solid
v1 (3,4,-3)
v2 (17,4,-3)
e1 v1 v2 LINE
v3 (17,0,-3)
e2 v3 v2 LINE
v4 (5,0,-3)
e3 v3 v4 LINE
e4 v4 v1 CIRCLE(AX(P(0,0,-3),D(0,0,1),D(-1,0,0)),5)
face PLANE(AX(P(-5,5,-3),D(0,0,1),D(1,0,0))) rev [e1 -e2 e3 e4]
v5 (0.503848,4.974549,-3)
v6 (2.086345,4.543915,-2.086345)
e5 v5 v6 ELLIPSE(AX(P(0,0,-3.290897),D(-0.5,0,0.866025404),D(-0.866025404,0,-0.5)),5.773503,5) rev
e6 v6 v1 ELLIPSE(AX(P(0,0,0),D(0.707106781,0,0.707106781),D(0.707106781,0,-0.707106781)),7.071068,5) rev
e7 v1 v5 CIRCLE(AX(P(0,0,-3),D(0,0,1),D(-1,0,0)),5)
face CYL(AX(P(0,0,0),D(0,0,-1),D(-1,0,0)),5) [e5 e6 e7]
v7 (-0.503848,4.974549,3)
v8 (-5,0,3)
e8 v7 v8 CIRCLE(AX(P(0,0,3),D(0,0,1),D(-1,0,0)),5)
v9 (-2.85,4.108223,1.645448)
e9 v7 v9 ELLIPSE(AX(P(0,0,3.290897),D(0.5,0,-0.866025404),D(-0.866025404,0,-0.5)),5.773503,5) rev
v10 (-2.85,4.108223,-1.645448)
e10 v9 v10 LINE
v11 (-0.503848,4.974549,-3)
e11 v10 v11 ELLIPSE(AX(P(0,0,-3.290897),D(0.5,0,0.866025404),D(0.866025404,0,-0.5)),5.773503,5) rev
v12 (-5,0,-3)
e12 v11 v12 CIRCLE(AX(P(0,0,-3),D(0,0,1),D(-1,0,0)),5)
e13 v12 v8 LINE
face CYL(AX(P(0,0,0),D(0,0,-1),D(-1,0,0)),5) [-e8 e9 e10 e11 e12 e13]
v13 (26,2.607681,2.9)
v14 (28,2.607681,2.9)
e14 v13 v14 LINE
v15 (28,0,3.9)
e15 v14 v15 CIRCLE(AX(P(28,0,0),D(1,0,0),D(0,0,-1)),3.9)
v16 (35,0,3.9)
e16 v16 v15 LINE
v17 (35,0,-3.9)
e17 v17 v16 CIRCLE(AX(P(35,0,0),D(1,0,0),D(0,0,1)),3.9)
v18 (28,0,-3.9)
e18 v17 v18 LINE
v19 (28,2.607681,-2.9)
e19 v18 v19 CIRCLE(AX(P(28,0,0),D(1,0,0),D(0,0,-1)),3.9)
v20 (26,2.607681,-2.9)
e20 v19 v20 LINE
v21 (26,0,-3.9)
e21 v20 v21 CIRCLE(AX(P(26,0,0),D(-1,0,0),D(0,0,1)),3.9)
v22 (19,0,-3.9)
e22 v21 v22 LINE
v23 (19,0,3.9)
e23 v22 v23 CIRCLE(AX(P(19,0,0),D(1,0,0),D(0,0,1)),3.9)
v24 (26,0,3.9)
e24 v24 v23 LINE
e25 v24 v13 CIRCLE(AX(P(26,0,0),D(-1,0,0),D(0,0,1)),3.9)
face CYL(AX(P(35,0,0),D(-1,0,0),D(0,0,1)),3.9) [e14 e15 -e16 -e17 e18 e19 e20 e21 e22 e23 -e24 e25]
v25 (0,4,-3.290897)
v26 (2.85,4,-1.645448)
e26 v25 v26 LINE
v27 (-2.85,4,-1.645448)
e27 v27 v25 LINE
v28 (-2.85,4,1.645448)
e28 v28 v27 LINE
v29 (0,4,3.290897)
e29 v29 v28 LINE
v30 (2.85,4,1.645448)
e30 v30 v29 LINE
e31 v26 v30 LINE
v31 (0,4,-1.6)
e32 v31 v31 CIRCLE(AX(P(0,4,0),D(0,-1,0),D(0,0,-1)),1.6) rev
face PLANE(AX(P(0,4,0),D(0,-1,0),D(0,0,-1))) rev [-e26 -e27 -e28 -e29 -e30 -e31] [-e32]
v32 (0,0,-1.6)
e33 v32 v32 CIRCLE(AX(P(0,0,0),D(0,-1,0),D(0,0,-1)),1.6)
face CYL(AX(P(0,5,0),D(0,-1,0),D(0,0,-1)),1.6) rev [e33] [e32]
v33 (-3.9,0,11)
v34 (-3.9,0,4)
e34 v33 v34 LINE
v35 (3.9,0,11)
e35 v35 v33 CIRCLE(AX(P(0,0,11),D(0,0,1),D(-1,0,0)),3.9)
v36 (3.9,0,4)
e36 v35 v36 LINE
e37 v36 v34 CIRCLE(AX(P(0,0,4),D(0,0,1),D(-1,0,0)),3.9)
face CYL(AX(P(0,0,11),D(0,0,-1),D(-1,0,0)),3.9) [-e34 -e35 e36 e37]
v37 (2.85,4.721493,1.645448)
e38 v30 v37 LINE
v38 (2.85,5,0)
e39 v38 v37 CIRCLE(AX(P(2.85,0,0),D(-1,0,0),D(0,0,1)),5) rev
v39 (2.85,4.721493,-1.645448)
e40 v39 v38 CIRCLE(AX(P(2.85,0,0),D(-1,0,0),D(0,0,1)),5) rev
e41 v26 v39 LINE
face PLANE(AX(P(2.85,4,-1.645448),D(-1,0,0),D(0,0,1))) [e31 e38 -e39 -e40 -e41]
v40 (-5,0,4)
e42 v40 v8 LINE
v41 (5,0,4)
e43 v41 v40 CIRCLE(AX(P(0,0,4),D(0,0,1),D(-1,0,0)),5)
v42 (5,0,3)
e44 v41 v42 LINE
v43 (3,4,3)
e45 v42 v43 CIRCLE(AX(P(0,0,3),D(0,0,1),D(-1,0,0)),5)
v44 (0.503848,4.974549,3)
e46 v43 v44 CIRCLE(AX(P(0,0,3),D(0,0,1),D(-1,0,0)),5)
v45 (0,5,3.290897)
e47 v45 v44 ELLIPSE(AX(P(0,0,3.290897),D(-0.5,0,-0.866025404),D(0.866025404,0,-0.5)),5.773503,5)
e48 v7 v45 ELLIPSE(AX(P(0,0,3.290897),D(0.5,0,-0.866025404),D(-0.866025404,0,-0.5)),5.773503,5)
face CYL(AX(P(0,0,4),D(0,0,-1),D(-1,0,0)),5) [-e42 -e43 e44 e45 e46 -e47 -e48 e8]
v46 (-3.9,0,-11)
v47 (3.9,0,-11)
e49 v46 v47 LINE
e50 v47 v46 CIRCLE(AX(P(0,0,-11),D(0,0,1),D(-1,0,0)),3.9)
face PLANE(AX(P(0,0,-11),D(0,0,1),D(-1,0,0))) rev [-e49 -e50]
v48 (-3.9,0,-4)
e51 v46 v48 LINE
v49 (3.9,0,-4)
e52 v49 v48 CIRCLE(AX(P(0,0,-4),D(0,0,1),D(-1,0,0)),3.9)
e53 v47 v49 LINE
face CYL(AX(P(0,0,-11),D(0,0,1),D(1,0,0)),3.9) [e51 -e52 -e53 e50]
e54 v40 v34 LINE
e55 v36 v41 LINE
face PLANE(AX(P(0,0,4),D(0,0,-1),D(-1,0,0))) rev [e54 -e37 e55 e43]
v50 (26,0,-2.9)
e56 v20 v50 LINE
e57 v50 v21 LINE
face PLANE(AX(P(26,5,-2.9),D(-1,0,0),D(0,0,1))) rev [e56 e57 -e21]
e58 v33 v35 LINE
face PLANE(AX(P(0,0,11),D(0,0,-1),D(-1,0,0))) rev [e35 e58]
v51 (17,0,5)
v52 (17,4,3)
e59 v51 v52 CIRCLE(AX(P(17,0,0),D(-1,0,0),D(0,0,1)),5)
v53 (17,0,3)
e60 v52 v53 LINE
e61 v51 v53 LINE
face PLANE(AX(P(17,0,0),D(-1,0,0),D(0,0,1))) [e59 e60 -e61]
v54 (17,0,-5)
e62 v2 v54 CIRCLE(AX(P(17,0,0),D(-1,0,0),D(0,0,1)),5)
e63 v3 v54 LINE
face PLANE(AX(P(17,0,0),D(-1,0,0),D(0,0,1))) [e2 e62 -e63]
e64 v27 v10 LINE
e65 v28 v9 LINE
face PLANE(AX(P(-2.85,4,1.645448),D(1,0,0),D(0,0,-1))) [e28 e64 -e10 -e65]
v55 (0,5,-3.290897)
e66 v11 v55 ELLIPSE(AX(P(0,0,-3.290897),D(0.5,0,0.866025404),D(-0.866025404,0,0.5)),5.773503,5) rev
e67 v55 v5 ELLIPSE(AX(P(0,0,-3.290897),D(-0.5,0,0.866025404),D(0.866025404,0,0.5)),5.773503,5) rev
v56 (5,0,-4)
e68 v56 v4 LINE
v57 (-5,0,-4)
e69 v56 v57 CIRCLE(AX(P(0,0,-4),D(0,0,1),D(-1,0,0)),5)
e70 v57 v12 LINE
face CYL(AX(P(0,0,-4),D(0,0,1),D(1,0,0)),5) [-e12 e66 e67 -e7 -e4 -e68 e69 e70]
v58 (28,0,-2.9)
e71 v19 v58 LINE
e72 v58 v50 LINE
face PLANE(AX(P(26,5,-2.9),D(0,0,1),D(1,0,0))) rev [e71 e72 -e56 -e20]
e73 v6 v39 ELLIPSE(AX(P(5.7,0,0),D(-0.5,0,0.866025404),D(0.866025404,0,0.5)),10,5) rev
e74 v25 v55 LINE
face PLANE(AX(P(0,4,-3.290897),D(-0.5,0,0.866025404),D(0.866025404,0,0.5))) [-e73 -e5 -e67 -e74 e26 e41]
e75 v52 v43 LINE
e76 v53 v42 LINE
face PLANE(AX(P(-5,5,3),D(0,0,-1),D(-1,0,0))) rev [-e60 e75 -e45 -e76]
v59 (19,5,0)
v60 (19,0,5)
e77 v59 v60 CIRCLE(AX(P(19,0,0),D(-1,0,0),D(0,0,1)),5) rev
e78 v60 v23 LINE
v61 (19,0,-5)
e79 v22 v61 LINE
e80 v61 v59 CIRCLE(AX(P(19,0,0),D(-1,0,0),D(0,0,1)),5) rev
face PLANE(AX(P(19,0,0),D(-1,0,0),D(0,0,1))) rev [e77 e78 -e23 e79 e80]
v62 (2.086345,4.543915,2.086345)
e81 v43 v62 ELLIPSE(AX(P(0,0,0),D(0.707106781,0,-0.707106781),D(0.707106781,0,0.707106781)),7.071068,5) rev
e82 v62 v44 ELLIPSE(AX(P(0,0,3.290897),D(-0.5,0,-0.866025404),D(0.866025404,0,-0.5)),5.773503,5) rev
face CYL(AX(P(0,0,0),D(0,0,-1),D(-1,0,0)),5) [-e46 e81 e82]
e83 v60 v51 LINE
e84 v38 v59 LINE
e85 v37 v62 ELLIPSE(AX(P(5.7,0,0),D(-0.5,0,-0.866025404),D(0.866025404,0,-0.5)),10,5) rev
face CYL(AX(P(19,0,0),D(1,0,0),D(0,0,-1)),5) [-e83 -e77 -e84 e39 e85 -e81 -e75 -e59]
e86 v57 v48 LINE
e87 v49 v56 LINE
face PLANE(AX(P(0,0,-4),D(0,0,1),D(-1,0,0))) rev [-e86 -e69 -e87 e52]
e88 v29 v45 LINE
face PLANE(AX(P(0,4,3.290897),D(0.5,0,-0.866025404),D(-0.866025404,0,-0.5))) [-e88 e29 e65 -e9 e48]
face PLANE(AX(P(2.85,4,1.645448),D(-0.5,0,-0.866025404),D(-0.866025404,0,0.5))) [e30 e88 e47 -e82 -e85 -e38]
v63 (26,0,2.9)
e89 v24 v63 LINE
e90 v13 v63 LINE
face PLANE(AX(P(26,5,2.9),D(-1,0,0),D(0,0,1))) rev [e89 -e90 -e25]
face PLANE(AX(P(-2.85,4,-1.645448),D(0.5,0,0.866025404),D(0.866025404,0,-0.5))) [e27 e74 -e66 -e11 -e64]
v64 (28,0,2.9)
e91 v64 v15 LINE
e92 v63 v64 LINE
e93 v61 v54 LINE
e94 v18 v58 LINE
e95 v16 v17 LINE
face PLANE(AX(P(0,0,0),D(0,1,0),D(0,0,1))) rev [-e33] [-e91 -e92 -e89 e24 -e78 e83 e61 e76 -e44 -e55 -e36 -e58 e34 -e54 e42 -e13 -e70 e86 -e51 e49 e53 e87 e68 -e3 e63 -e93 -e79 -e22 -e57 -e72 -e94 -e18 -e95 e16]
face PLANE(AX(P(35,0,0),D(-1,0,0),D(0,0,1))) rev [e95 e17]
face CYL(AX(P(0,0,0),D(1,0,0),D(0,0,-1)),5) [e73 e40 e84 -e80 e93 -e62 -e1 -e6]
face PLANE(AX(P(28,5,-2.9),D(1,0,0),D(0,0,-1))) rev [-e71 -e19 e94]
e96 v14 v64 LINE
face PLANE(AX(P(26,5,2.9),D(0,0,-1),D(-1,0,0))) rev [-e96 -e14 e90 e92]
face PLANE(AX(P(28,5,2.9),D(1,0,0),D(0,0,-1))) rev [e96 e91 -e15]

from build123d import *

# Parameters (mm, degrees)
SKETCH1_W           = 10
SKETCH1_H           = 6
BOSS_EXTRUDE1_DEPTH = 5
BOSS_EXTRUDE2_DEPTH = 1
BOSS_EXTRUDE3_DEPTH = 7
FILLET1_R           = 5
SKETCH4_W           = 6
SKETCH4_H           = 5
BOSS_EXTRUDE4_DEPTH = 12
SKETCH5_W           = 10
SKETCH5_H           = 5
BOSS_EXTRUDE5_DEPTH = 2
FILLET3_START       = 5.05342
FILLET3_DEPTH       = 13.94658
FILLET3_START_2     = 3
FILLET3_2_DEPTH     = 2.14658
FILLET3_3_DEPTH     = 3
FILLET3_START_3     = -3
FILLET3_4_DEPTH     = 6
BOSS_EXTRUDE6_DEPTH = 16
SKETCH7_R           = 1.6
SKETCH7_W           = 2
SKETCH7_H           = 1
CUT_EXTRUDE1_DEPTH  = 38.027017163
CUT_EXTRUDE6_DEPTH  = 1


with BuildPart() as part:
    # Sketch1 → Boss-Extrude1 (new body)
    with BuildSketch(Plane(origin=(0, 0, 0), x_dir=(1, 0, 0), z_dir=(0, 1, 0))):
        Rectangle(SKETCH1_W, SKETCH1_H)
    extrude(amount=BOSS_EXTRUDE1_DEPTH)

    # Sketch2 → Boss-Extrude2 (add)
    with BuildSketch(Plane.XY.offset(3)):
        with BuildLine():
            Line((5, 0), (-5, 0))
            ThreePointArc((-5, 0), (0, 5), (5, 0))
        make_face()
    boss_extrude2 = extrude(amount=BOSS_EXTRUDE2_DEPTH)

    # Sketch3 → Boss-Extrude3 (add)
    with BuildSketch(Plane.XY.offset(4)):
        with BuildLine():
            Line((-3.9, 0), (3.9, 0))
            ThreePointArc((3.9, 0), (0, 3.9), (-3.9, 0))
        make_face()
    boss_extrude3 = extrude(amount=BOSS_EXTRUDE3_DEPTH)

    # Mirror1: Boss-Extrude2, Boss-Extrude3 across plane
    add(boss_extrude2.mirror(Plane.XY))
    add(boss_extrude3.mirror(Plane.XY))

    # Fillet1
    fillet1_edges = [part.edges().sort_by_distance(p)[0] for p in [
        (-5, 5, 0),
    ]]
    fillet(fillet1_edges, radius=FILLET1_R - 0.0001)  # a hair under: the kernel refuses the full size

    # Sketch4 → Boss-Extrude4 (add)
    with BuildSketch(Plane(origin=(5, 0, 0), x_dir=(0, 0, -1), z_dir=(1, 0, 0))):
        with Locations((0, 2.5)):
            Rectangle(SKETCH4_W, SKETCH4_H)
    extrude(amount=BOSS_EXTRUDE4_DEPTH)

    # Sketch5 → Boss-Extrude5 (add)
    with BuildSketch(Plane(origin=(17, 0, 0), x_dir=(0, 0, -1), z_dir=(1, 0, 0))):
        with Locations((0, 2.5)):
            Rectangle(SKETCH5_W, SKETCH5_H)
    extrude(amount=BOSS_EXTRUDE5_DEPTH)

    # Fillet3: read off the stored shape, not the designer's step
    # Fillet3 outline → Fillet3 (cut)
    with BuildSketch(Plane.YZ.offset(FILLET3_START)):
        with BuildLine():
            ThreePointArc((5, 0), (3.535533906, -3.535533906), (0, -5))
            Line((0, -5), (5, -5))
            Line((5, -5), (5, 0))
        make_face()
        with BuildLine():
            Line((5, 0), (5, 5))
            Line((5, 5), (0, 5))
            ThreePointArc((0, 5), (3.535533906, 3.535533906), (5, 0))
        make_face()
    extrude(amount=FILLET3_DEPTH, mode=Mode.SUBTRACT)

    # Fillet3 2 outline → Fillet3 2 (cut)
    with BuildSketch(Plane.YZ.offset(FILLET3_START_2)):
        with BuildLine():
            Line((5, -3), (5, 0))
            ThreePointArc((5, 0), (4.74341649, -1.58113883), (4, -3))
            Line((4, -3), (5, -3))
        make_face()
        with BuildLine():
            ThreePointArc((4, 3), (4.74341649, 1.58113883), (5, 0))
            Line((5, 0), (5, 3))
            Line((5, 3), (4, 3))
        make_face()
    extrude(amount=FILLET3_2_DEPTH, mode=Mode.SUBTRACT)

    # Fillet3 3 outline → Fillet3 3 (cut)
    with BuildSketch(Plane.YZ):
        with BuildLine():
            Line((5, -3), (5, 0))
            ThreePointArc((5, 0), (4.74341649, -1.58113883), (4, -3))
            Line((4, -3), (5, -3))
        make_face()
        with BuildLine():
            ThreePointArc((4, 3), (4.74341649, 1.58113883), (5, 0))
            Line((5, 0), (5, 3))
            Line((5, 3), (4, 3))
        make_face()
    extrude(amount=FILLET3_3_DEPTH, mode=Mode.SUBTRACT)

    # Fillet3 4 outline → Fillet3 4 (add)
    with BuildSketch(Plane.XY.offset(FILLET3_START_3)):
        with BuildLine():
            ThreePointArc((3, 4), (1.58113883, 4.74341649), (0, 5))
            ThreePointArc((0, 5), (-0.50254481, 4.974680765), (-1, 4.898979485))
            Line((-1, 4.898979485), (-1, 2))
            Line((-1, 2), (4, 2))
            Line((4, 2), (4, 3.25))
            Line((4, 3.25), (3, 4))
        make_face()
    extrude(amount=FILLET3_4_DEPTH)

    # Sketch6 → Boss-Extrude6 (add)
    with BuildSketch(Plane(origin=(19, 0, 0), x_dir=(0, 0, -1), z_dir=(1, 0, 0))):
        with BuildLine():
            Line((-3.9, 0), (3.9, 0))
            ThreePointArc((3.9, 0), (0, 3.9), (-3.9, 0))
        make_face()
    extrude(amount=BOSS_EXTRUDE6_DEPTH)

    # Sketch7 → Cut-Extrude1 (cut, through all)
    with BuildSketch(Plane(origin=(0, 0, 0), x_dir=(-1, 0, 0), z_dir=(0, -1, 0))):
        with Locations(Location((0, 0, 0), (0, 0, 90))):
            Circle(SKETCH7_R)
        with Locations((-27, -3.4)):
            Rectangle(SKETCH7_W, SKETCH7_H)
        with Locations((-27, 3.4)):
            Rectangle(SKETCH7_W, SKETCH7_H)
    extrude(amount=-CUT_EXTRUDE1_DEPTH, mode=Mode.SUBTRACT)

    # Sketch9 → Cut-Extrude6 (cut)
    with BuildSketch(Plane(origin=(0, 5, 0), x_dir=(-1, 0, 0), z_dir=(0, -1, 0))):
        Polygon((-2.85, 1.645448267), (-2.85, -1.645448267), (0, -3.290896534), (2.85, -1.645448267), (2.85, 1.645448267), (0, 3.290896534), align=None)
    extrude(amount=CUT_EXTRUDE6_DEPTH, mode=Mode.SUBTRACT)


solid = part.part
